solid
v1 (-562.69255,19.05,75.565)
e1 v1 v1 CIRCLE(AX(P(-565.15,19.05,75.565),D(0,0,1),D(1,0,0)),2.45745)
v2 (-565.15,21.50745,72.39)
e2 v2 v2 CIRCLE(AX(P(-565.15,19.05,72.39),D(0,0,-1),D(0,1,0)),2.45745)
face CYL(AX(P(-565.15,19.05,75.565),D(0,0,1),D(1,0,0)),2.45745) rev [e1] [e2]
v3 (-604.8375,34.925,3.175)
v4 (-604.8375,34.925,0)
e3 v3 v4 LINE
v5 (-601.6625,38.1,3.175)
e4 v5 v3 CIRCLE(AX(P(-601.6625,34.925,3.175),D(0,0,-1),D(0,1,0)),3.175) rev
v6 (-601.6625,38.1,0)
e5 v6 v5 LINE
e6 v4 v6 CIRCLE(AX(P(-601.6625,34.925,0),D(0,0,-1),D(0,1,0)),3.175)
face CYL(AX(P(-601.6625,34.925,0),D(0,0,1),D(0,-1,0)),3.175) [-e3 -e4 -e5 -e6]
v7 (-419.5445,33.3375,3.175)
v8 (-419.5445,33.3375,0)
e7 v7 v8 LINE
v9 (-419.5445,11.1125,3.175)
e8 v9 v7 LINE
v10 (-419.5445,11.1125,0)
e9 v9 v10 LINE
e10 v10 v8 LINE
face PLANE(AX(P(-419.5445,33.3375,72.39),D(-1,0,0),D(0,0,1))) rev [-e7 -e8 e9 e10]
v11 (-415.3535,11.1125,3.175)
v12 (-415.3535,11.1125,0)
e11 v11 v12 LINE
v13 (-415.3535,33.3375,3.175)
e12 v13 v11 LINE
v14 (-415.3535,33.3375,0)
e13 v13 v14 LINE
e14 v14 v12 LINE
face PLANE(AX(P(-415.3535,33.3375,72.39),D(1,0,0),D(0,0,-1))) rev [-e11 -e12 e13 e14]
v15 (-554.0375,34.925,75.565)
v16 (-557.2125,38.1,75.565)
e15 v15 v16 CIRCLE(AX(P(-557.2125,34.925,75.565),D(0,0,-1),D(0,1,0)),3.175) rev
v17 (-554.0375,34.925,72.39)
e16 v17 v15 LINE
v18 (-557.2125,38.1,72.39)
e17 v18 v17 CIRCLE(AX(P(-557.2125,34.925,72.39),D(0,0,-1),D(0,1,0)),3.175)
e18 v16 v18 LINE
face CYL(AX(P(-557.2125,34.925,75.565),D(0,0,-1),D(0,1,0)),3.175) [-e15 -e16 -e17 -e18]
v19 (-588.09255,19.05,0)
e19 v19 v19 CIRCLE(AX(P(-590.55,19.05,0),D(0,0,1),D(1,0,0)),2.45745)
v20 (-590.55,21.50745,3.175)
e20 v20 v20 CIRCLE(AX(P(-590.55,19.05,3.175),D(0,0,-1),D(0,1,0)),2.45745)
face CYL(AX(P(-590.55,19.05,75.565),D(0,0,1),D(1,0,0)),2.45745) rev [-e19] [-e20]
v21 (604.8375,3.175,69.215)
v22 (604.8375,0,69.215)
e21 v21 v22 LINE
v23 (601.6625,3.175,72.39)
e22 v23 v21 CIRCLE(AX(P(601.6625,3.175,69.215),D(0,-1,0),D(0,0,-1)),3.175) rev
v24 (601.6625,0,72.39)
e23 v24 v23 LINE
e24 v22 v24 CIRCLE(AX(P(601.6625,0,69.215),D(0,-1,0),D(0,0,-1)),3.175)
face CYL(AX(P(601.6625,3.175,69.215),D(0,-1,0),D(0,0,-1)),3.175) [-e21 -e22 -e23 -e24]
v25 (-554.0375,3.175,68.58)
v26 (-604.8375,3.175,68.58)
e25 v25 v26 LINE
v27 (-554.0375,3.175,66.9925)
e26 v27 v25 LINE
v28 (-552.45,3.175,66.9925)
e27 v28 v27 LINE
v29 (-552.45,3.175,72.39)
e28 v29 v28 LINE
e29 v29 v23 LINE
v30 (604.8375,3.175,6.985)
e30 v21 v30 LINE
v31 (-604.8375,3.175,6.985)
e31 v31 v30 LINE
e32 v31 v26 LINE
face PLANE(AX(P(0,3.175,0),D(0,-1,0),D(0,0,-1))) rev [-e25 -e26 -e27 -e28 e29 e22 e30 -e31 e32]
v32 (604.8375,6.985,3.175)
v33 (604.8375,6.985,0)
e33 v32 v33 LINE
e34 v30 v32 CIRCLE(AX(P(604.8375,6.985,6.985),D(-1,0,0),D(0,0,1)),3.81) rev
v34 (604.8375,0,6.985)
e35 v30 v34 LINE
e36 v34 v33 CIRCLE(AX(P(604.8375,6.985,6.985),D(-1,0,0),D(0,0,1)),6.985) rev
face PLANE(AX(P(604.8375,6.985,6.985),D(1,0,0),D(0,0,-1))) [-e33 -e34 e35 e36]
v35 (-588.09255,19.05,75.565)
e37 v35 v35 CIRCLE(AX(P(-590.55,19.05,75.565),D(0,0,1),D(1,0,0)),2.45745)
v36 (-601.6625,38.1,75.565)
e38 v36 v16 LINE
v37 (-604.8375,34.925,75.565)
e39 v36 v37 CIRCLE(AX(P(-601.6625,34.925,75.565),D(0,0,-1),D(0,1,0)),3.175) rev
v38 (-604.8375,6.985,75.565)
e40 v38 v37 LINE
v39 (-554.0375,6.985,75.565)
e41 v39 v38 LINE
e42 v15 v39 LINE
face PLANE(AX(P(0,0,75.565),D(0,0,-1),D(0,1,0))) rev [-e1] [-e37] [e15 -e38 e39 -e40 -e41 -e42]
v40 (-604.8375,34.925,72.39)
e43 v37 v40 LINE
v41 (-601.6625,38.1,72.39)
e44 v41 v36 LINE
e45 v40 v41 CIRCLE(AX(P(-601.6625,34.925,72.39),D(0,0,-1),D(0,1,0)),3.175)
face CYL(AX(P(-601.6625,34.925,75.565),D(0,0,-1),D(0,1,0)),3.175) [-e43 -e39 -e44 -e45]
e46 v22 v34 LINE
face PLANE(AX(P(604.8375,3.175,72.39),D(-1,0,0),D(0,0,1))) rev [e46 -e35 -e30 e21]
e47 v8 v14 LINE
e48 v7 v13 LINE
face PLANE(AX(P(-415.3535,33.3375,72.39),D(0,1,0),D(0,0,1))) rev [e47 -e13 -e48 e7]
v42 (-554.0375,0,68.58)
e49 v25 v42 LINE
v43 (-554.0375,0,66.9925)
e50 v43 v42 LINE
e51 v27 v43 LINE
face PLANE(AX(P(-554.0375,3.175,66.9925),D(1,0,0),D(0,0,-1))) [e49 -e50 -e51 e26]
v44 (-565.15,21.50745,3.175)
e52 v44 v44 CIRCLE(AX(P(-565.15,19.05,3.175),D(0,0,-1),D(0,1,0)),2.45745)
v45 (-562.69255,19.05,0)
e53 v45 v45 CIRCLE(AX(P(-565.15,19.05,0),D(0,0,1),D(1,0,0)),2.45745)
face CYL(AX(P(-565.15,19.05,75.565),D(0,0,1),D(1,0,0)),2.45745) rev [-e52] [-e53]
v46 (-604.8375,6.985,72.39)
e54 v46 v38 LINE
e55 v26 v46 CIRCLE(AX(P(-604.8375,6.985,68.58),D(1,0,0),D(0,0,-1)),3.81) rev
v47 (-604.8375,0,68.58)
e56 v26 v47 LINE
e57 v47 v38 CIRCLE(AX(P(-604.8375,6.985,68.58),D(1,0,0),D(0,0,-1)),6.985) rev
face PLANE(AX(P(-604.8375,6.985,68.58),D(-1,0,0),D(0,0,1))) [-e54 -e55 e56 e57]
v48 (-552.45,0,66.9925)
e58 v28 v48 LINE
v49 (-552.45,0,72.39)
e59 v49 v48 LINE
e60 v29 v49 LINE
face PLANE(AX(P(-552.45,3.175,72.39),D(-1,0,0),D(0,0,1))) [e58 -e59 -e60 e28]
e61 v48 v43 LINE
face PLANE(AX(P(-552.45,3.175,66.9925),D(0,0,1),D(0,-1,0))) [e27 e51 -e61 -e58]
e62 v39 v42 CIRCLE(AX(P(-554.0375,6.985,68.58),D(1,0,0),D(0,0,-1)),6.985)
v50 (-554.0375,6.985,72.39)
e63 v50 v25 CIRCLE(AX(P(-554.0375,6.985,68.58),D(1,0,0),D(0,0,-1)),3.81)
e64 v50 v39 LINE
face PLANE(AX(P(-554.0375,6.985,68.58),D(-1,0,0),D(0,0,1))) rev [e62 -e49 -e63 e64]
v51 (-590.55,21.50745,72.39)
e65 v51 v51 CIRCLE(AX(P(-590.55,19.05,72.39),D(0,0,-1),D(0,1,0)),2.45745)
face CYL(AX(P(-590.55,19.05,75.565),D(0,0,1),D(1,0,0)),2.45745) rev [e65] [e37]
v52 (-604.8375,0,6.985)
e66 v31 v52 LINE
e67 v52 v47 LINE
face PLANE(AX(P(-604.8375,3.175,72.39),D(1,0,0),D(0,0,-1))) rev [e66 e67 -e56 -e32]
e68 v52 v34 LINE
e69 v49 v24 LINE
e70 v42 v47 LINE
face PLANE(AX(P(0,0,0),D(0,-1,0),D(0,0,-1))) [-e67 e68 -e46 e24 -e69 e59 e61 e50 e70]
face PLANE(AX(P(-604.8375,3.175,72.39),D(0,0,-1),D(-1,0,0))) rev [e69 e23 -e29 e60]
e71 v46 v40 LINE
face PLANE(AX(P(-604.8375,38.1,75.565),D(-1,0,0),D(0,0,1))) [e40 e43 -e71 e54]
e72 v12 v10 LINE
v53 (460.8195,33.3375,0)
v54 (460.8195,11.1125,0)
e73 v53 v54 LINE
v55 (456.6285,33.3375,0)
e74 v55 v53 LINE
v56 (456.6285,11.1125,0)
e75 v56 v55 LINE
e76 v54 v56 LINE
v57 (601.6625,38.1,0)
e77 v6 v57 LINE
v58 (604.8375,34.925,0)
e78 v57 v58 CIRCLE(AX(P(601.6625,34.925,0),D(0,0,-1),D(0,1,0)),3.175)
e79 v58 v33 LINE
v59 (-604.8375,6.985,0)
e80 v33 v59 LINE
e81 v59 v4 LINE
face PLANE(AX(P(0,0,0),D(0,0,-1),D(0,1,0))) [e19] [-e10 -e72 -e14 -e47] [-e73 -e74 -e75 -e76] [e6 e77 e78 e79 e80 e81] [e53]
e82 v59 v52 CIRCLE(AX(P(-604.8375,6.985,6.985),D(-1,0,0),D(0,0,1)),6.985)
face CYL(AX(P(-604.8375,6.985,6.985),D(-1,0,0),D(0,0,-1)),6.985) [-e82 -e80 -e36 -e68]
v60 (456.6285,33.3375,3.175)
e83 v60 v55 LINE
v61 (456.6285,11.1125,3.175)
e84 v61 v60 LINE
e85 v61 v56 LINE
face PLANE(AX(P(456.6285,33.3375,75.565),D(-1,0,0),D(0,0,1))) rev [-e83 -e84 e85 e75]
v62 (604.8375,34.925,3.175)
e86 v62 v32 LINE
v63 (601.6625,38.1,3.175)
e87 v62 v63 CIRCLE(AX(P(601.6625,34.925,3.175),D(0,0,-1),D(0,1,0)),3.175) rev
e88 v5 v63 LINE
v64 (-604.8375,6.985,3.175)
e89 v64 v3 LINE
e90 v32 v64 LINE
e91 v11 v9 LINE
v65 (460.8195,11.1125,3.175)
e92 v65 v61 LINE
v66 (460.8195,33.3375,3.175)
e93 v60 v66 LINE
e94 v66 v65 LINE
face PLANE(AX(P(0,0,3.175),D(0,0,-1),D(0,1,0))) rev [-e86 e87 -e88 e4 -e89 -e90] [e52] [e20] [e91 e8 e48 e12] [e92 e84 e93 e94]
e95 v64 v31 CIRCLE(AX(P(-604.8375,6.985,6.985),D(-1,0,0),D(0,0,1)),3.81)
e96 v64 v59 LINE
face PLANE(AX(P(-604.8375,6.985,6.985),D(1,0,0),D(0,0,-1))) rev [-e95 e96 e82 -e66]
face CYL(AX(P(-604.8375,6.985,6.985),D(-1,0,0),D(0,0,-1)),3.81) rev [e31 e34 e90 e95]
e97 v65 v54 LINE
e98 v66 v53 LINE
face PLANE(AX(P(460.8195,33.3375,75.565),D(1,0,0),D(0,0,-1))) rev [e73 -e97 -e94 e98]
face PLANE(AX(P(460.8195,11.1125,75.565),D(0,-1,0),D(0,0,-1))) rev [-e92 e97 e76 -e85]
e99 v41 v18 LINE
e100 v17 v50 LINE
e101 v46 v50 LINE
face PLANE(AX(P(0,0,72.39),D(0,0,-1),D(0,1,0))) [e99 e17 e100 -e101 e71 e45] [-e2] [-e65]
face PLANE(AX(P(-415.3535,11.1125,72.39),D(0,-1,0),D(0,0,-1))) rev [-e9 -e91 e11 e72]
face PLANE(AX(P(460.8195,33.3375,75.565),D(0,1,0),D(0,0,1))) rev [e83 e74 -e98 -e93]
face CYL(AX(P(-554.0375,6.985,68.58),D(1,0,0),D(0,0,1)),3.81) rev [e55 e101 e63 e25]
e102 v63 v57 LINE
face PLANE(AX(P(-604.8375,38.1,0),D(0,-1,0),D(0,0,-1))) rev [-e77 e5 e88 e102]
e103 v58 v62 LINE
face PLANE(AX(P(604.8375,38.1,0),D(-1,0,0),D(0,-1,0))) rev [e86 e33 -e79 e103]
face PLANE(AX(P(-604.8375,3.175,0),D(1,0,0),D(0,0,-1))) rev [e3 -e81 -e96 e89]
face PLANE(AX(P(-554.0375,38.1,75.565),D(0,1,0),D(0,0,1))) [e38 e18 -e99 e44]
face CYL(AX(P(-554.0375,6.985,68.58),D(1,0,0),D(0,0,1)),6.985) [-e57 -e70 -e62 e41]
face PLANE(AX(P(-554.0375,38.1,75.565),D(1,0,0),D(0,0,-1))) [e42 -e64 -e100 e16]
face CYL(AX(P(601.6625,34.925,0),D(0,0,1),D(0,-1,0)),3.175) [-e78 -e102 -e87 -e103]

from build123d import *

# Parameters (mm, degrees)
SKETCH1_W                     = 1209.675
SKETCH1_H                     = 72.39
BASE_FLANGE1_DEPTH            = 3.175
EDGE_FLANGE1_STRIP_W          = 20.32
EDGE_FLANGE1_STRIP_H          = 3.175
EDGE_FLANGE1_STRIP_CUT_DEPTH  = 1209.675
EDGE_FLANGE1_DEPTH            = 1209.675
SKETCH10_W                    = 4.191
SKETCH10_H                    = 22.225
CUT_EXTRUDE2_DEPTH            = 611.344430225
EDGE_FLANGE2_STRIP_W          = 20.32
EDGE_FLANGE2_STRIP_H          = 3.175
EDGE_FLANGE2_STRIP_CUT_DEPTH  = 50.8
EDGE_FLANGE2_RELIEF_W         = 21.9075
EDGE_FLANGE2_RELIEF_H         = 1.5875
EDGE_FLANGE2_RELIEF_CUT_DEPTH = 3.175
EDGE_FLANGE2_DEPTH            = 50.8
F_10_0_1935_DIAMETER_HOLE1_D  = 4.9149
FILLET1_R                     = 3.175
LPATTERN1_COUNT               = 2
LPATTERN1_PITCH               = 876.173


# Sheet-metal steps are written as plain solids
with BuildPart() as part:
    # Sketch1 → Base-Flange1 (new body)
    with BuildSketch(Plane(origin=(0, 0, 0), x_dir=(1, 0, 0), z_dir=(0, 1, 0))):
        with Locations((0, -36.195)):
            Rectangle(SKETCH1_W, SKETCH1_H)
    extrude(amount=BASE_FLANGE1_DEPTH)

    # Edge-Flange1 strip (across the edge) → Edge-Flange1 strip cut (cut)
    with BuildSketch(Plane(origin=(604.8375, 3.175, 0), x_dir=(0, 0, 1), z_dir=(-1, 0, 0))):
        with Locations((-3.175, -1.5875)):
            Rectangle(EDGE_FLANGE1_STRIP_W, EDGE_FLANGE1_STRIP_H)
    extrude(amount=EDGE_FLANGE1_STRIP_CUT_DEPTH, mode=Mode.SUBTRACT)

    # Edge-Flange1 section (across the edge) → Edge-Flange1 (add)
    with BuildSketch(Plane(origin=(604.8375, 3.175, 0), x_dir=(0, 0, 1), z_dir=(-1, 0, 0))):
        with BuildLine():
            Line((0, 3.81), (0, 34.925))
            Line((0, 34.925), (3.175, 34.925))
            Line((3.175, 34.925), (3.175, 3.81))
            ThreePointArc((3.175, 3.81), (4.290923164, 1.115923164), (6.985, 0))
            Line((6.985, 0), (6.985, -3.175))
            ThreePointArc((6.985, -3.175), (2.045859133, -1.129140867), (0, 3.81))
        make_face()
    extrude(amount=EDGE_FLANGE1_DEPTH)

    # Sketch10 → Cut-Extrude2 (cut, through all)
    with BuildSketch(Plane(origin=(0, 0, 0), x_dir=(-1, 0, 0), z_dir=(0, 0, -1))):
        with Locations((417.449, 22.225)):
            Rectangle(SKETCH10_W, SKETCH10_H)
    cut_extrude2 = extrude(amount=-CUT_EXTRUDE2_DEPTH, mode=Mode.SUBTRACT)

    # Edge-Flange2 strip (across the edge) → Edge-Flange2 strip cut (cut)
    with BuildSketch(Plane(origin=(-604.8375, 3.175, 72.39), x_dir=(0, 0, -1), z_dir=(1, 0, 0))):
        with Locations((-6.35, -1.5875)):
            Rectangle(EDGE_FLANGE2_STRIP_W, EDGE_FLANGE2_STRIP_H)
    extrude(amount=EDGE_FLANGE2_STRIP_CUT_DEPTH, mode=Mode.SUBTRACT)

    # Edge-Flange2 relief (on the sheet) → Edge-Flange2 relief cut (cut)
    with BuildSketch(Plane(origin=(-604.8375, 3.175, 68.58), x_dir=(0, 0, -1), z_dir=(0, 1, 0))):
        with Locations((-9.36625, -51.59375)):
            Rectangle(EDGE_FLANGE2_RELIEF_W, EDGE_FLANGE2_RELIEF_H)
    extrude(amount=-EDGE_FLANGE2_RELIEF_CUT_DEPTH, mode=Mode.SUBTRACT)

    # Edge-Flange2 section (across the edge) → Edge-Flange2 (add)
    with BuildSketch(Plane(origin=(-604.8375, 3.175, 72.39), x_dir=(0, 0, -1), z_dir=(1, 0, 0))):
        with BuildLine():
            Line((-3.175, 3.81), (-3.175, 34.925))
            Line((-3.175, 34.925), (0, 34.925))
            Line((0, 34.925), (0, 3.81))
            ThreePointArc((0, 3.81), (1.115923164, 1.115923164), (3.81, 0))
            Line((3.81, 0), (3.81, -3.175))
            ThreePointArc((3.81, -3.175), (-1.129140867, -1.129140867), (-3.175, 3.81))
        make_face()
    extrude(amount=EDGE_FLANGE2_DEPTH)

    # #10 (0.1935) Diameter Hole1 (through all)
    with Locations(Plane.XY.offset(75.565)):
        with Locations((-565.15, 19.05), (-590.55, 19.05)):
            Hole(F_10_0_1935_DIAMETER_HOLE1_D / 2)

    # Fillet1
    fillet1_edges = [part.edges().sort_by_distance(p)[0] for p in [
        (-604.8375, 38.1, 73.9775),
        (-554.0375, 38.1, 73.9775),
        (604.8375, 38.1, 1.5875),
        (-604.8375, 38.1, 1.5875),
        (604.8375, 1.5875, 72.39),
    ]]
    fillet(fillet1_edges, radius=FILLET1_R)

    # LPattern1: Cut-Extrude2 ×2
    with Locations(*[(i * LPATTERN1_PITCH, 0, 0) for i in range(1, LPATTERN1_COUNT)]):
        add(cut_extrude2, mode=Mode.SUBTRACT)


solid = part.part
